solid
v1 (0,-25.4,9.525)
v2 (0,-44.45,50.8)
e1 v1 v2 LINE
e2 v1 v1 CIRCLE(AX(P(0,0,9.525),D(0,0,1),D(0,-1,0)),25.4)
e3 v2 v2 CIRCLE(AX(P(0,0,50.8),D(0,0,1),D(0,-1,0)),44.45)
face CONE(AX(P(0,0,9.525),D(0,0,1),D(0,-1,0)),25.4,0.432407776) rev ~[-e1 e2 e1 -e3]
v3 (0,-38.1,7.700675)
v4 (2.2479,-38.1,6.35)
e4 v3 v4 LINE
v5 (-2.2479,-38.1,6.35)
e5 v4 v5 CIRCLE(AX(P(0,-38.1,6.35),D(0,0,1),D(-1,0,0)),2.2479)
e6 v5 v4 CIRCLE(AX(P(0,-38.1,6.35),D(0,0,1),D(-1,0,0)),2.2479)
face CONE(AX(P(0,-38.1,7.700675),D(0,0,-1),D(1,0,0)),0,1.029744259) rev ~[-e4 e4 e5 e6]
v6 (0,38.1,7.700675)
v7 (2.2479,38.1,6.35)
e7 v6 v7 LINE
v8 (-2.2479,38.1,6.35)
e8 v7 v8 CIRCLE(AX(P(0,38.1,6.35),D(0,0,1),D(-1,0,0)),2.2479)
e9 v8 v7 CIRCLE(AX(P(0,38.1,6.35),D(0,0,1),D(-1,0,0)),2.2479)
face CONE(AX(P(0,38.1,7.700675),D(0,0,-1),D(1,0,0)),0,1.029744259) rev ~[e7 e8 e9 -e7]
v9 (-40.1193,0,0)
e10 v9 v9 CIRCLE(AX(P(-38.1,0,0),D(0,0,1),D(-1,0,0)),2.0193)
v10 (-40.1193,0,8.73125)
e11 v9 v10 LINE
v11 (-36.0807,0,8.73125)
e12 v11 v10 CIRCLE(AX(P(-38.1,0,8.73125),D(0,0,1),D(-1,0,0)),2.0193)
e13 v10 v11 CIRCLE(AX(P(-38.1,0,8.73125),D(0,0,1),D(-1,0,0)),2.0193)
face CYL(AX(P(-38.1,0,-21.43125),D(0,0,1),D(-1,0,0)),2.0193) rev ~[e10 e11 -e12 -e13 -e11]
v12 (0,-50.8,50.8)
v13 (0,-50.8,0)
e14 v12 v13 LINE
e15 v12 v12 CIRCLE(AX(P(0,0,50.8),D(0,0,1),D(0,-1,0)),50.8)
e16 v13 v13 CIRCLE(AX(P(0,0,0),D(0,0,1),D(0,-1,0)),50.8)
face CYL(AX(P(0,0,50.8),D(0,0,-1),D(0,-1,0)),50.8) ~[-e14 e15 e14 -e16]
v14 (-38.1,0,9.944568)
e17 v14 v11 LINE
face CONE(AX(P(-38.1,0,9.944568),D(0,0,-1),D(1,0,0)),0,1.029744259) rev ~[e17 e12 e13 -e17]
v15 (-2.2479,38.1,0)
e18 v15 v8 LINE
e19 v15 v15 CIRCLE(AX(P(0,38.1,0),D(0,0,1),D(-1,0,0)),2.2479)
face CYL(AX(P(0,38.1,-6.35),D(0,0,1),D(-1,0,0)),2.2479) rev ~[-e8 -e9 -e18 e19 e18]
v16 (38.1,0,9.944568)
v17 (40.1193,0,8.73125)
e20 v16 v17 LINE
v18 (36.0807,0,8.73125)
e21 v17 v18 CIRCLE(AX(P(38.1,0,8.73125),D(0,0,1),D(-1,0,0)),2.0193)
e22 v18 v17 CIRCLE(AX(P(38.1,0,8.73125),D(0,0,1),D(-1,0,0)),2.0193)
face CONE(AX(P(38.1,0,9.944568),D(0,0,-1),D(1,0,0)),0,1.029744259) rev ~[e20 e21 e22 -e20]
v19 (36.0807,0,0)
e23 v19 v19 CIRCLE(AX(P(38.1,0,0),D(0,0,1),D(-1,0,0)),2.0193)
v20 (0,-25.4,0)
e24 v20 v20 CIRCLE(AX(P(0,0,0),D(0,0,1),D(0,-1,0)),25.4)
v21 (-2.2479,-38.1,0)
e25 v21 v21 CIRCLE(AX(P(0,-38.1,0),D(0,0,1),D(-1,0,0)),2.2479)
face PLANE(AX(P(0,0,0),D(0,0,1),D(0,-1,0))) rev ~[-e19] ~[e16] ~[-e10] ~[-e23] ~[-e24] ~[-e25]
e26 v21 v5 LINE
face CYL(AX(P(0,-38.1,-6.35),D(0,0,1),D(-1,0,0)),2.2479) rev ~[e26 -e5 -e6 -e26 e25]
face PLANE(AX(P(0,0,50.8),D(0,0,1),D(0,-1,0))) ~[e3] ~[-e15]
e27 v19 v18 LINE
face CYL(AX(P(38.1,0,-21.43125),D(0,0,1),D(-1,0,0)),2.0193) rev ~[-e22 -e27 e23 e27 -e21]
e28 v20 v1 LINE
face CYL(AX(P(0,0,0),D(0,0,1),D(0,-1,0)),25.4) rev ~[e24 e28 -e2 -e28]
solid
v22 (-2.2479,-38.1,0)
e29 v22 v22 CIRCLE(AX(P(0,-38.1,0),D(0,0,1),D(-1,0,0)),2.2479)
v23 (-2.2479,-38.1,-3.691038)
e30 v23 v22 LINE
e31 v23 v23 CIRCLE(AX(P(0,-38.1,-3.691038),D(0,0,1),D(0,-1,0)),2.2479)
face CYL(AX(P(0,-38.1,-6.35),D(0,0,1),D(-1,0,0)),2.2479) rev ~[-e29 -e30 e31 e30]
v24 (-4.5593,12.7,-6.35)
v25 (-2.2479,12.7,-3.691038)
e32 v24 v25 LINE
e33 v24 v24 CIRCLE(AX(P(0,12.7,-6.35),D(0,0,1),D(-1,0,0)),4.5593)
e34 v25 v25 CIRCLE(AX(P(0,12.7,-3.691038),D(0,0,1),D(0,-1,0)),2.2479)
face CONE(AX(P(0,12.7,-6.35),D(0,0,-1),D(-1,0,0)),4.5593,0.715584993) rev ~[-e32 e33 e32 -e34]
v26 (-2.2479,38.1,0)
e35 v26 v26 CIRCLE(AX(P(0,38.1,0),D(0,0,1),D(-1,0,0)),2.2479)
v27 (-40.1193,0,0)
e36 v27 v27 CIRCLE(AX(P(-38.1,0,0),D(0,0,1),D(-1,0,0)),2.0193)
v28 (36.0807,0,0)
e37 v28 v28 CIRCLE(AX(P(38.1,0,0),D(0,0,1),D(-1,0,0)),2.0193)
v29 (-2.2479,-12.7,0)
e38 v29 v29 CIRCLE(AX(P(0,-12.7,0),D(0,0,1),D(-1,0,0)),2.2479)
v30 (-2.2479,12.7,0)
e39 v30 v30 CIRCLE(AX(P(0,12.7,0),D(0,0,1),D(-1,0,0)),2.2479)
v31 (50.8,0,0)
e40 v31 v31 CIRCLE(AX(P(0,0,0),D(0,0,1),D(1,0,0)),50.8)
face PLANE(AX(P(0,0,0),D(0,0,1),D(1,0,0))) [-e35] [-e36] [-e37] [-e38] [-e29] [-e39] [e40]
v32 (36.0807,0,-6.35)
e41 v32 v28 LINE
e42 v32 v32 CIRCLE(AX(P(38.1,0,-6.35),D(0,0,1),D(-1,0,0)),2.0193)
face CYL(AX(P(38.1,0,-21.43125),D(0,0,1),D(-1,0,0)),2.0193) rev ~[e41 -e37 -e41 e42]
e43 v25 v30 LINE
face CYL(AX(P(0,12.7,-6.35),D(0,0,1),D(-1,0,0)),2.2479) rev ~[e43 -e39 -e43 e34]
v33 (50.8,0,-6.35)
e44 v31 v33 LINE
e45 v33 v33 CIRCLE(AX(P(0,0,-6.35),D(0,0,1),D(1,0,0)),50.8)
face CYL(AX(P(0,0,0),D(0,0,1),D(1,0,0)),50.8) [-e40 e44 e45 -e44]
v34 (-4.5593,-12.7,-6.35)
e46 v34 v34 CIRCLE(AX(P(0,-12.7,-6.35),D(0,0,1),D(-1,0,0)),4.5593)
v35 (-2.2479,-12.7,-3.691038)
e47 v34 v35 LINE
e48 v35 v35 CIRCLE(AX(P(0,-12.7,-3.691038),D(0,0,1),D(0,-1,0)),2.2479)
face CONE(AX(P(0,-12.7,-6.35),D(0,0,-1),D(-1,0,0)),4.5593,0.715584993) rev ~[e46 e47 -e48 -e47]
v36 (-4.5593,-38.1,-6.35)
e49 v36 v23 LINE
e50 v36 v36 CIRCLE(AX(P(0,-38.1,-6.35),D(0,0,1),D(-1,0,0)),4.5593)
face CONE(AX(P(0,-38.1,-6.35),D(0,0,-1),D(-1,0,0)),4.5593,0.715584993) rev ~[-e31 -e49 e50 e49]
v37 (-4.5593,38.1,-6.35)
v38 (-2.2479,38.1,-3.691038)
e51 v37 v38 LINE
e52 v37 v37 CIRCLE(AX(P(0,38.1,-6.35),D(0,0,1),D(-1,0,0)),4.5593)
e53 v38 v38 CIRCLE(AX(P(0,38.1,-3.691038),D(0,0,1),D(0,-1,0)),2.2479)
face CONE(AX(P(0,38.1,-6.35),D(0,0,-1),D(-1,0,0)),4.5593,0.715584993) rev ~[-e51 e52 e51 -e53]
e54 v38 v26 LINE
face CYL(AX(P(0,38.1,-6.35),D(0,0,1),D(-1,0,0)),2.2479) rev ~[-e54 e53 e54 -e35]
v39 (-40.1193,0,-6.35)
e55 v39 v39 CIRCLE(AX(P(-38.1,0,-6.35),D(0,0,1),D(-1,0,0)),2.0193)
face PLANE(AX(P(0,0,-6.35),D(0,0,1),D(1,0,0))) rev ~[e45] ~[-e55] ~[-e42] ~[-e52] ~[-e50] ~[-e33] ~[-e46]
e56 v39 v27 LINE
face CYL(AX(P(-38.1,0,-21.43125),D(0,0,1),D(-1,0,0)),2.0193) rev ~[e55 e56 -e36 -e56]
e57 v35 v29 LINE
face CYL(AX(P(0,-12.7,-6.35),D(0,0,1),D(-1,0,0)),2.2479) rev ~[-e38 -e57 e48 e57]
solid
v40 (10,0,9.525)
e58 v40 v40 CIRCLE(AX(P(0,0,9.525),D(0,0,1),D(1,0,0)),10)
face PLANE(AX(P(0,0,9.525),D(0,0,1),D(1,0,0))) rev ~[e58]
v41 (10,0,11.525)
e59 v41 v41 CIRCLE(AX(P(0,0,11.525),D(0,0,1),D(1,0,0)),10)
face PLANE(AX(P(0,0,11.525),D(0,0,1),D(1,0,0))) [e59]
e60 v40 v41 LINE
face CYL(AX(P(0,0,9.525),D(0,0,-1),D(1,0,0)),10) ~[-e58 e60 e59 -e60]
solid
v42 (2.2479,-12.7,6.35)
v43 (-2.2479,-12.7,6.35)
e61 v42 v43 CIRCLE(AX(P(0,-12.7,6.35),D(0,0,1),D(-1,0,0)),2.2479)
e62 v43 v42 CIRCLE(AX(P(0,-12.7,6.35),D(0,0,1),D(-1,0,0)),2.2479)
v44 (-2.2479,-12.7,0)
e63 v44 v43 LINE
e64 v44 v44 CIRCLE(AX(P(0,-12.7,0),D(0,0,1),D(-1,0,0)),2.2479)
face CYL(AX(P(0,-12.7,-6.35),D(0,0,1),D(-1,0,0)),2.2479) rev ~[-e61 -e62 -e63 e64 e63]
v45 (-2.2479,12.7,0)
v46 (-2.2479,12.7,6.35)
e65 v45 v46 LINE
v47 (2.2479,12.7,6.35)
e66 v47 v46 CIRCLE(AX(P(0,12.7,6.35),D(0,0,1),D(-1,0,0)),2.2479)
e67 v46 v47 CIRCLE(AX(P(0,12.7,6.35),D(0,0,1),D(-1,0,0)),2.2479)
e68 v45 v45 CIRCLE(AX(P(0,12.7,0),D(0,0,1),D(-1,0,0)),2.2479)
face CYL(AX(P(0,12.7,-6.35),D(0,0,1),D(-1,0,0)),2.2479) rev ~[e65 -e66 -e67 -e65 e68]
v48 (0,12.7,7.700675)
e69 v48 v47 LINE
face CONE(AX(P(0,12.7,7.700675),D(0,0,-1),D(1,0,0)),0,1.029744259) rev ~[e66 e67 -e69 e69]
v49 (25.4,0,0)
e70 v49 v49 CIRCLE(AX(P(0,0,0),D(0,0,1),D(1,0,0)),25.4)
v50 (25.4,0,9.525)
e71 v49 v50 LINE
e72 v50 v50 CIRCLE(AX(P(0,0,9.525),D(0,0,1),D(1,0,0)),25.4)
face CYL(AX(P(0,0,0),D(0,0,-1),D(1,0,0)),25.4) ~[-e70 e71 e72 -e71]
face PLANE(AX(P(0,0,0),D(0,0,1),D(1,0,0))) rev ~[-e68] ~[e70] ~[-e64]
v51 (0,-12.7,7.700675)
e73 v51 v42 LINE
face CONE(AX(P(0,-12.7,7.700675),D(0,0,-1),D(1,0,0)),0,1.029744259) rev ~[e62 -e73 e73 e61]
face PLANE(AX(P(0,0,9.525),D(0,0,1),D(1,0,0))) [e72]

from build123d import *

# Parameters (mm, degrees)
F0_R              = 25.4
F1_DEPTH          = 9.525
F2_R              = 10
F3_DEPTH          = 2
F7_R              = 50.8
F8_DEPTH          = 6.35
F10_D             = 4.4958
F10_DEPTH         = 12.7
F10_CSINK_D       = 9.1186
F10_CSINK_ANGLE   = 82
F10_TIP           = 1.3506745855
F10_2_D           = 4.4958
F10_2_DEPTH       = 12.7
F10_2_CSINK_D     = 9.1186
F10_2_CSINK_ANGLE = 82
F10_2_TIP         = 1.3506745855
F10_3_D           = 4.4958
F10_3_DEPTH       = 12.7
F10_3_CSINK_D     = 9.1186
F10_3_CSINK_ANGLE = 82
F10_3_TIP         = 1.3506745855
F11_D             = 4.0386
F11_DEPTH         = 15.08125
F11_TIP           = 1.213317848
F11_2_D           = 4.0386
F11_2_DEPTH       = 15.08125
F11_2_TIP         = 1.213317848


# Not quite as in the source:
# - a length typed as a fraction of an inch, garbled in the dataset ("3 / 203.2 mm" for 3/8 in), is restored


with BuildPart() as f1:
    # F0 (on Top) → F1 (new body)
    with BuildSketch(Plane.XY):
        Circle(F0_R)
    extrude(amount=F1_DEPTH)

    # F10
    with Locations(Plane(origin=(0, 0, -6.35), x_dir=(1, 0, 0), z_dir=(0, 0, -1))):
        with Locations((0, 38.1), (0, 12.7), (0, -12.7), (0, -38.1)):
            CounterSinkHole(F10_D / 2, F10_CSINK_D / 2, depth=F10_DEPTH, counter_sink_angle=F10_CSINK_ANGLE)
            with Locations((0, 0, -(F10_DEPTH + F10_TIP / 2))):  # 118° drill point
                Cone(0, F10_D / 2, F10_TIP, mode=Mode.SUBTRACT)


with BuildPart() as f3:
    # F2 (on face) → F3 (new body)
    with BuildSketch(Plane.XY.offset(9.525)):
        Circle(F2_R)
    extrude(amount=F3_DEPTH)


with BuildPart() as f6:
    # F5 (on Right) → F6 (revolve)
    with BuildSketch(Plane.YZ):
        Polygon((-50.8, 0), (-25.4, 0), (-25.4, 9.525), (-44.45, 50.8), (-50.8, 50.8), align=None)
    revolve(axis=Axis((0, 0, 35.1485721767), (0, 0, 1)))

    # F10#2
    with Locations(Plane(origin=(0, 0, -6.35), x_dir=(1, 0, 0), z_dir=(0, 0, -1))):
        with Locations((0, 38.1), (0, 12.7), (0, -12.7), (0, -38.1)):
            CounterSinkHole(F10_2_D / 2, F10_2_CSINK_D / 2, depth=F10_2_DEPTH, counter_sink_angle=F10_2_CSINK_ANGLE)
            with Locations((0, 0, -(F10_2_DEPTH + F10_2_TIP / 2))):  # 118° drill point
                Cone(0, F10_2_D / 2, F10_2_TIP, mode=Mode.SUBTRACT)

    # F11
    with Locations(Plane(origin=(0, 0, -6.35), x_dir=(1, 0, 0), z_dir=(0, 0, -1))):
        with Locations((38.1, 0), (-38.1, 0)):
            Hole(F11_D / 2, depth=F11_DEPTH)
            with Locations((0, 0, -(F11_DEPTH + F11_TIP / 2))):  # 118° drill point
                Cone(0, F11_D / 2, F11_TIP, mode=Mode.SUBTRACT)


with BuildPart() as f8:
    # F7 (on face) → F8 (new body)
    with BuildSketch(Plane.XY):
        Circle(F7_R)
    extrude(amount=-F8_DEPTH)

    # F10#3
    with Locations(Plane(origin=(0, 0, -6.35), x_dir=(1, 0, 0), z_dir=(0, 0, -1))):
        with Locations((0, 38.1), (0, 12.7), (0, -12.7), (0, -38.1)):
            CounterSinkHole(F10_3_D / 2, F10_3_CSINK_D / 2, depth=F10_3_DEPTH, counter_sink_angle=F10_3_CSINK_ANGLE)
            with Locations((0, 0, -(F10_3_DEPTH + F10_3_TIP / 2))):  # 118° drill point
                Cone(0, F10_3_D / 2, F10_3_TIP, mode=Mode.SUBTRACT)

    # F11#2
    with Locations(Plane(origin=(0, 0, -6.35), x_dir=(1, 0, 0), z_dir=(0, 0, -1))):
        with Locations((38.1, 0), (-38.1, 0)):
            Hole(F11_2_D / 2, depth=F11_2_DEPTH)
            with Locations((0, 0, -(F11_2_DEPTH + F11_2_TIP / 2))):  # 118° drill point
                Cone(0, F11_2_D / 2, F11_2_TIP, mode=Mode.SUBTRACT)


solid = Compound([f1.part, f3.part, f6.part, f8.part])
